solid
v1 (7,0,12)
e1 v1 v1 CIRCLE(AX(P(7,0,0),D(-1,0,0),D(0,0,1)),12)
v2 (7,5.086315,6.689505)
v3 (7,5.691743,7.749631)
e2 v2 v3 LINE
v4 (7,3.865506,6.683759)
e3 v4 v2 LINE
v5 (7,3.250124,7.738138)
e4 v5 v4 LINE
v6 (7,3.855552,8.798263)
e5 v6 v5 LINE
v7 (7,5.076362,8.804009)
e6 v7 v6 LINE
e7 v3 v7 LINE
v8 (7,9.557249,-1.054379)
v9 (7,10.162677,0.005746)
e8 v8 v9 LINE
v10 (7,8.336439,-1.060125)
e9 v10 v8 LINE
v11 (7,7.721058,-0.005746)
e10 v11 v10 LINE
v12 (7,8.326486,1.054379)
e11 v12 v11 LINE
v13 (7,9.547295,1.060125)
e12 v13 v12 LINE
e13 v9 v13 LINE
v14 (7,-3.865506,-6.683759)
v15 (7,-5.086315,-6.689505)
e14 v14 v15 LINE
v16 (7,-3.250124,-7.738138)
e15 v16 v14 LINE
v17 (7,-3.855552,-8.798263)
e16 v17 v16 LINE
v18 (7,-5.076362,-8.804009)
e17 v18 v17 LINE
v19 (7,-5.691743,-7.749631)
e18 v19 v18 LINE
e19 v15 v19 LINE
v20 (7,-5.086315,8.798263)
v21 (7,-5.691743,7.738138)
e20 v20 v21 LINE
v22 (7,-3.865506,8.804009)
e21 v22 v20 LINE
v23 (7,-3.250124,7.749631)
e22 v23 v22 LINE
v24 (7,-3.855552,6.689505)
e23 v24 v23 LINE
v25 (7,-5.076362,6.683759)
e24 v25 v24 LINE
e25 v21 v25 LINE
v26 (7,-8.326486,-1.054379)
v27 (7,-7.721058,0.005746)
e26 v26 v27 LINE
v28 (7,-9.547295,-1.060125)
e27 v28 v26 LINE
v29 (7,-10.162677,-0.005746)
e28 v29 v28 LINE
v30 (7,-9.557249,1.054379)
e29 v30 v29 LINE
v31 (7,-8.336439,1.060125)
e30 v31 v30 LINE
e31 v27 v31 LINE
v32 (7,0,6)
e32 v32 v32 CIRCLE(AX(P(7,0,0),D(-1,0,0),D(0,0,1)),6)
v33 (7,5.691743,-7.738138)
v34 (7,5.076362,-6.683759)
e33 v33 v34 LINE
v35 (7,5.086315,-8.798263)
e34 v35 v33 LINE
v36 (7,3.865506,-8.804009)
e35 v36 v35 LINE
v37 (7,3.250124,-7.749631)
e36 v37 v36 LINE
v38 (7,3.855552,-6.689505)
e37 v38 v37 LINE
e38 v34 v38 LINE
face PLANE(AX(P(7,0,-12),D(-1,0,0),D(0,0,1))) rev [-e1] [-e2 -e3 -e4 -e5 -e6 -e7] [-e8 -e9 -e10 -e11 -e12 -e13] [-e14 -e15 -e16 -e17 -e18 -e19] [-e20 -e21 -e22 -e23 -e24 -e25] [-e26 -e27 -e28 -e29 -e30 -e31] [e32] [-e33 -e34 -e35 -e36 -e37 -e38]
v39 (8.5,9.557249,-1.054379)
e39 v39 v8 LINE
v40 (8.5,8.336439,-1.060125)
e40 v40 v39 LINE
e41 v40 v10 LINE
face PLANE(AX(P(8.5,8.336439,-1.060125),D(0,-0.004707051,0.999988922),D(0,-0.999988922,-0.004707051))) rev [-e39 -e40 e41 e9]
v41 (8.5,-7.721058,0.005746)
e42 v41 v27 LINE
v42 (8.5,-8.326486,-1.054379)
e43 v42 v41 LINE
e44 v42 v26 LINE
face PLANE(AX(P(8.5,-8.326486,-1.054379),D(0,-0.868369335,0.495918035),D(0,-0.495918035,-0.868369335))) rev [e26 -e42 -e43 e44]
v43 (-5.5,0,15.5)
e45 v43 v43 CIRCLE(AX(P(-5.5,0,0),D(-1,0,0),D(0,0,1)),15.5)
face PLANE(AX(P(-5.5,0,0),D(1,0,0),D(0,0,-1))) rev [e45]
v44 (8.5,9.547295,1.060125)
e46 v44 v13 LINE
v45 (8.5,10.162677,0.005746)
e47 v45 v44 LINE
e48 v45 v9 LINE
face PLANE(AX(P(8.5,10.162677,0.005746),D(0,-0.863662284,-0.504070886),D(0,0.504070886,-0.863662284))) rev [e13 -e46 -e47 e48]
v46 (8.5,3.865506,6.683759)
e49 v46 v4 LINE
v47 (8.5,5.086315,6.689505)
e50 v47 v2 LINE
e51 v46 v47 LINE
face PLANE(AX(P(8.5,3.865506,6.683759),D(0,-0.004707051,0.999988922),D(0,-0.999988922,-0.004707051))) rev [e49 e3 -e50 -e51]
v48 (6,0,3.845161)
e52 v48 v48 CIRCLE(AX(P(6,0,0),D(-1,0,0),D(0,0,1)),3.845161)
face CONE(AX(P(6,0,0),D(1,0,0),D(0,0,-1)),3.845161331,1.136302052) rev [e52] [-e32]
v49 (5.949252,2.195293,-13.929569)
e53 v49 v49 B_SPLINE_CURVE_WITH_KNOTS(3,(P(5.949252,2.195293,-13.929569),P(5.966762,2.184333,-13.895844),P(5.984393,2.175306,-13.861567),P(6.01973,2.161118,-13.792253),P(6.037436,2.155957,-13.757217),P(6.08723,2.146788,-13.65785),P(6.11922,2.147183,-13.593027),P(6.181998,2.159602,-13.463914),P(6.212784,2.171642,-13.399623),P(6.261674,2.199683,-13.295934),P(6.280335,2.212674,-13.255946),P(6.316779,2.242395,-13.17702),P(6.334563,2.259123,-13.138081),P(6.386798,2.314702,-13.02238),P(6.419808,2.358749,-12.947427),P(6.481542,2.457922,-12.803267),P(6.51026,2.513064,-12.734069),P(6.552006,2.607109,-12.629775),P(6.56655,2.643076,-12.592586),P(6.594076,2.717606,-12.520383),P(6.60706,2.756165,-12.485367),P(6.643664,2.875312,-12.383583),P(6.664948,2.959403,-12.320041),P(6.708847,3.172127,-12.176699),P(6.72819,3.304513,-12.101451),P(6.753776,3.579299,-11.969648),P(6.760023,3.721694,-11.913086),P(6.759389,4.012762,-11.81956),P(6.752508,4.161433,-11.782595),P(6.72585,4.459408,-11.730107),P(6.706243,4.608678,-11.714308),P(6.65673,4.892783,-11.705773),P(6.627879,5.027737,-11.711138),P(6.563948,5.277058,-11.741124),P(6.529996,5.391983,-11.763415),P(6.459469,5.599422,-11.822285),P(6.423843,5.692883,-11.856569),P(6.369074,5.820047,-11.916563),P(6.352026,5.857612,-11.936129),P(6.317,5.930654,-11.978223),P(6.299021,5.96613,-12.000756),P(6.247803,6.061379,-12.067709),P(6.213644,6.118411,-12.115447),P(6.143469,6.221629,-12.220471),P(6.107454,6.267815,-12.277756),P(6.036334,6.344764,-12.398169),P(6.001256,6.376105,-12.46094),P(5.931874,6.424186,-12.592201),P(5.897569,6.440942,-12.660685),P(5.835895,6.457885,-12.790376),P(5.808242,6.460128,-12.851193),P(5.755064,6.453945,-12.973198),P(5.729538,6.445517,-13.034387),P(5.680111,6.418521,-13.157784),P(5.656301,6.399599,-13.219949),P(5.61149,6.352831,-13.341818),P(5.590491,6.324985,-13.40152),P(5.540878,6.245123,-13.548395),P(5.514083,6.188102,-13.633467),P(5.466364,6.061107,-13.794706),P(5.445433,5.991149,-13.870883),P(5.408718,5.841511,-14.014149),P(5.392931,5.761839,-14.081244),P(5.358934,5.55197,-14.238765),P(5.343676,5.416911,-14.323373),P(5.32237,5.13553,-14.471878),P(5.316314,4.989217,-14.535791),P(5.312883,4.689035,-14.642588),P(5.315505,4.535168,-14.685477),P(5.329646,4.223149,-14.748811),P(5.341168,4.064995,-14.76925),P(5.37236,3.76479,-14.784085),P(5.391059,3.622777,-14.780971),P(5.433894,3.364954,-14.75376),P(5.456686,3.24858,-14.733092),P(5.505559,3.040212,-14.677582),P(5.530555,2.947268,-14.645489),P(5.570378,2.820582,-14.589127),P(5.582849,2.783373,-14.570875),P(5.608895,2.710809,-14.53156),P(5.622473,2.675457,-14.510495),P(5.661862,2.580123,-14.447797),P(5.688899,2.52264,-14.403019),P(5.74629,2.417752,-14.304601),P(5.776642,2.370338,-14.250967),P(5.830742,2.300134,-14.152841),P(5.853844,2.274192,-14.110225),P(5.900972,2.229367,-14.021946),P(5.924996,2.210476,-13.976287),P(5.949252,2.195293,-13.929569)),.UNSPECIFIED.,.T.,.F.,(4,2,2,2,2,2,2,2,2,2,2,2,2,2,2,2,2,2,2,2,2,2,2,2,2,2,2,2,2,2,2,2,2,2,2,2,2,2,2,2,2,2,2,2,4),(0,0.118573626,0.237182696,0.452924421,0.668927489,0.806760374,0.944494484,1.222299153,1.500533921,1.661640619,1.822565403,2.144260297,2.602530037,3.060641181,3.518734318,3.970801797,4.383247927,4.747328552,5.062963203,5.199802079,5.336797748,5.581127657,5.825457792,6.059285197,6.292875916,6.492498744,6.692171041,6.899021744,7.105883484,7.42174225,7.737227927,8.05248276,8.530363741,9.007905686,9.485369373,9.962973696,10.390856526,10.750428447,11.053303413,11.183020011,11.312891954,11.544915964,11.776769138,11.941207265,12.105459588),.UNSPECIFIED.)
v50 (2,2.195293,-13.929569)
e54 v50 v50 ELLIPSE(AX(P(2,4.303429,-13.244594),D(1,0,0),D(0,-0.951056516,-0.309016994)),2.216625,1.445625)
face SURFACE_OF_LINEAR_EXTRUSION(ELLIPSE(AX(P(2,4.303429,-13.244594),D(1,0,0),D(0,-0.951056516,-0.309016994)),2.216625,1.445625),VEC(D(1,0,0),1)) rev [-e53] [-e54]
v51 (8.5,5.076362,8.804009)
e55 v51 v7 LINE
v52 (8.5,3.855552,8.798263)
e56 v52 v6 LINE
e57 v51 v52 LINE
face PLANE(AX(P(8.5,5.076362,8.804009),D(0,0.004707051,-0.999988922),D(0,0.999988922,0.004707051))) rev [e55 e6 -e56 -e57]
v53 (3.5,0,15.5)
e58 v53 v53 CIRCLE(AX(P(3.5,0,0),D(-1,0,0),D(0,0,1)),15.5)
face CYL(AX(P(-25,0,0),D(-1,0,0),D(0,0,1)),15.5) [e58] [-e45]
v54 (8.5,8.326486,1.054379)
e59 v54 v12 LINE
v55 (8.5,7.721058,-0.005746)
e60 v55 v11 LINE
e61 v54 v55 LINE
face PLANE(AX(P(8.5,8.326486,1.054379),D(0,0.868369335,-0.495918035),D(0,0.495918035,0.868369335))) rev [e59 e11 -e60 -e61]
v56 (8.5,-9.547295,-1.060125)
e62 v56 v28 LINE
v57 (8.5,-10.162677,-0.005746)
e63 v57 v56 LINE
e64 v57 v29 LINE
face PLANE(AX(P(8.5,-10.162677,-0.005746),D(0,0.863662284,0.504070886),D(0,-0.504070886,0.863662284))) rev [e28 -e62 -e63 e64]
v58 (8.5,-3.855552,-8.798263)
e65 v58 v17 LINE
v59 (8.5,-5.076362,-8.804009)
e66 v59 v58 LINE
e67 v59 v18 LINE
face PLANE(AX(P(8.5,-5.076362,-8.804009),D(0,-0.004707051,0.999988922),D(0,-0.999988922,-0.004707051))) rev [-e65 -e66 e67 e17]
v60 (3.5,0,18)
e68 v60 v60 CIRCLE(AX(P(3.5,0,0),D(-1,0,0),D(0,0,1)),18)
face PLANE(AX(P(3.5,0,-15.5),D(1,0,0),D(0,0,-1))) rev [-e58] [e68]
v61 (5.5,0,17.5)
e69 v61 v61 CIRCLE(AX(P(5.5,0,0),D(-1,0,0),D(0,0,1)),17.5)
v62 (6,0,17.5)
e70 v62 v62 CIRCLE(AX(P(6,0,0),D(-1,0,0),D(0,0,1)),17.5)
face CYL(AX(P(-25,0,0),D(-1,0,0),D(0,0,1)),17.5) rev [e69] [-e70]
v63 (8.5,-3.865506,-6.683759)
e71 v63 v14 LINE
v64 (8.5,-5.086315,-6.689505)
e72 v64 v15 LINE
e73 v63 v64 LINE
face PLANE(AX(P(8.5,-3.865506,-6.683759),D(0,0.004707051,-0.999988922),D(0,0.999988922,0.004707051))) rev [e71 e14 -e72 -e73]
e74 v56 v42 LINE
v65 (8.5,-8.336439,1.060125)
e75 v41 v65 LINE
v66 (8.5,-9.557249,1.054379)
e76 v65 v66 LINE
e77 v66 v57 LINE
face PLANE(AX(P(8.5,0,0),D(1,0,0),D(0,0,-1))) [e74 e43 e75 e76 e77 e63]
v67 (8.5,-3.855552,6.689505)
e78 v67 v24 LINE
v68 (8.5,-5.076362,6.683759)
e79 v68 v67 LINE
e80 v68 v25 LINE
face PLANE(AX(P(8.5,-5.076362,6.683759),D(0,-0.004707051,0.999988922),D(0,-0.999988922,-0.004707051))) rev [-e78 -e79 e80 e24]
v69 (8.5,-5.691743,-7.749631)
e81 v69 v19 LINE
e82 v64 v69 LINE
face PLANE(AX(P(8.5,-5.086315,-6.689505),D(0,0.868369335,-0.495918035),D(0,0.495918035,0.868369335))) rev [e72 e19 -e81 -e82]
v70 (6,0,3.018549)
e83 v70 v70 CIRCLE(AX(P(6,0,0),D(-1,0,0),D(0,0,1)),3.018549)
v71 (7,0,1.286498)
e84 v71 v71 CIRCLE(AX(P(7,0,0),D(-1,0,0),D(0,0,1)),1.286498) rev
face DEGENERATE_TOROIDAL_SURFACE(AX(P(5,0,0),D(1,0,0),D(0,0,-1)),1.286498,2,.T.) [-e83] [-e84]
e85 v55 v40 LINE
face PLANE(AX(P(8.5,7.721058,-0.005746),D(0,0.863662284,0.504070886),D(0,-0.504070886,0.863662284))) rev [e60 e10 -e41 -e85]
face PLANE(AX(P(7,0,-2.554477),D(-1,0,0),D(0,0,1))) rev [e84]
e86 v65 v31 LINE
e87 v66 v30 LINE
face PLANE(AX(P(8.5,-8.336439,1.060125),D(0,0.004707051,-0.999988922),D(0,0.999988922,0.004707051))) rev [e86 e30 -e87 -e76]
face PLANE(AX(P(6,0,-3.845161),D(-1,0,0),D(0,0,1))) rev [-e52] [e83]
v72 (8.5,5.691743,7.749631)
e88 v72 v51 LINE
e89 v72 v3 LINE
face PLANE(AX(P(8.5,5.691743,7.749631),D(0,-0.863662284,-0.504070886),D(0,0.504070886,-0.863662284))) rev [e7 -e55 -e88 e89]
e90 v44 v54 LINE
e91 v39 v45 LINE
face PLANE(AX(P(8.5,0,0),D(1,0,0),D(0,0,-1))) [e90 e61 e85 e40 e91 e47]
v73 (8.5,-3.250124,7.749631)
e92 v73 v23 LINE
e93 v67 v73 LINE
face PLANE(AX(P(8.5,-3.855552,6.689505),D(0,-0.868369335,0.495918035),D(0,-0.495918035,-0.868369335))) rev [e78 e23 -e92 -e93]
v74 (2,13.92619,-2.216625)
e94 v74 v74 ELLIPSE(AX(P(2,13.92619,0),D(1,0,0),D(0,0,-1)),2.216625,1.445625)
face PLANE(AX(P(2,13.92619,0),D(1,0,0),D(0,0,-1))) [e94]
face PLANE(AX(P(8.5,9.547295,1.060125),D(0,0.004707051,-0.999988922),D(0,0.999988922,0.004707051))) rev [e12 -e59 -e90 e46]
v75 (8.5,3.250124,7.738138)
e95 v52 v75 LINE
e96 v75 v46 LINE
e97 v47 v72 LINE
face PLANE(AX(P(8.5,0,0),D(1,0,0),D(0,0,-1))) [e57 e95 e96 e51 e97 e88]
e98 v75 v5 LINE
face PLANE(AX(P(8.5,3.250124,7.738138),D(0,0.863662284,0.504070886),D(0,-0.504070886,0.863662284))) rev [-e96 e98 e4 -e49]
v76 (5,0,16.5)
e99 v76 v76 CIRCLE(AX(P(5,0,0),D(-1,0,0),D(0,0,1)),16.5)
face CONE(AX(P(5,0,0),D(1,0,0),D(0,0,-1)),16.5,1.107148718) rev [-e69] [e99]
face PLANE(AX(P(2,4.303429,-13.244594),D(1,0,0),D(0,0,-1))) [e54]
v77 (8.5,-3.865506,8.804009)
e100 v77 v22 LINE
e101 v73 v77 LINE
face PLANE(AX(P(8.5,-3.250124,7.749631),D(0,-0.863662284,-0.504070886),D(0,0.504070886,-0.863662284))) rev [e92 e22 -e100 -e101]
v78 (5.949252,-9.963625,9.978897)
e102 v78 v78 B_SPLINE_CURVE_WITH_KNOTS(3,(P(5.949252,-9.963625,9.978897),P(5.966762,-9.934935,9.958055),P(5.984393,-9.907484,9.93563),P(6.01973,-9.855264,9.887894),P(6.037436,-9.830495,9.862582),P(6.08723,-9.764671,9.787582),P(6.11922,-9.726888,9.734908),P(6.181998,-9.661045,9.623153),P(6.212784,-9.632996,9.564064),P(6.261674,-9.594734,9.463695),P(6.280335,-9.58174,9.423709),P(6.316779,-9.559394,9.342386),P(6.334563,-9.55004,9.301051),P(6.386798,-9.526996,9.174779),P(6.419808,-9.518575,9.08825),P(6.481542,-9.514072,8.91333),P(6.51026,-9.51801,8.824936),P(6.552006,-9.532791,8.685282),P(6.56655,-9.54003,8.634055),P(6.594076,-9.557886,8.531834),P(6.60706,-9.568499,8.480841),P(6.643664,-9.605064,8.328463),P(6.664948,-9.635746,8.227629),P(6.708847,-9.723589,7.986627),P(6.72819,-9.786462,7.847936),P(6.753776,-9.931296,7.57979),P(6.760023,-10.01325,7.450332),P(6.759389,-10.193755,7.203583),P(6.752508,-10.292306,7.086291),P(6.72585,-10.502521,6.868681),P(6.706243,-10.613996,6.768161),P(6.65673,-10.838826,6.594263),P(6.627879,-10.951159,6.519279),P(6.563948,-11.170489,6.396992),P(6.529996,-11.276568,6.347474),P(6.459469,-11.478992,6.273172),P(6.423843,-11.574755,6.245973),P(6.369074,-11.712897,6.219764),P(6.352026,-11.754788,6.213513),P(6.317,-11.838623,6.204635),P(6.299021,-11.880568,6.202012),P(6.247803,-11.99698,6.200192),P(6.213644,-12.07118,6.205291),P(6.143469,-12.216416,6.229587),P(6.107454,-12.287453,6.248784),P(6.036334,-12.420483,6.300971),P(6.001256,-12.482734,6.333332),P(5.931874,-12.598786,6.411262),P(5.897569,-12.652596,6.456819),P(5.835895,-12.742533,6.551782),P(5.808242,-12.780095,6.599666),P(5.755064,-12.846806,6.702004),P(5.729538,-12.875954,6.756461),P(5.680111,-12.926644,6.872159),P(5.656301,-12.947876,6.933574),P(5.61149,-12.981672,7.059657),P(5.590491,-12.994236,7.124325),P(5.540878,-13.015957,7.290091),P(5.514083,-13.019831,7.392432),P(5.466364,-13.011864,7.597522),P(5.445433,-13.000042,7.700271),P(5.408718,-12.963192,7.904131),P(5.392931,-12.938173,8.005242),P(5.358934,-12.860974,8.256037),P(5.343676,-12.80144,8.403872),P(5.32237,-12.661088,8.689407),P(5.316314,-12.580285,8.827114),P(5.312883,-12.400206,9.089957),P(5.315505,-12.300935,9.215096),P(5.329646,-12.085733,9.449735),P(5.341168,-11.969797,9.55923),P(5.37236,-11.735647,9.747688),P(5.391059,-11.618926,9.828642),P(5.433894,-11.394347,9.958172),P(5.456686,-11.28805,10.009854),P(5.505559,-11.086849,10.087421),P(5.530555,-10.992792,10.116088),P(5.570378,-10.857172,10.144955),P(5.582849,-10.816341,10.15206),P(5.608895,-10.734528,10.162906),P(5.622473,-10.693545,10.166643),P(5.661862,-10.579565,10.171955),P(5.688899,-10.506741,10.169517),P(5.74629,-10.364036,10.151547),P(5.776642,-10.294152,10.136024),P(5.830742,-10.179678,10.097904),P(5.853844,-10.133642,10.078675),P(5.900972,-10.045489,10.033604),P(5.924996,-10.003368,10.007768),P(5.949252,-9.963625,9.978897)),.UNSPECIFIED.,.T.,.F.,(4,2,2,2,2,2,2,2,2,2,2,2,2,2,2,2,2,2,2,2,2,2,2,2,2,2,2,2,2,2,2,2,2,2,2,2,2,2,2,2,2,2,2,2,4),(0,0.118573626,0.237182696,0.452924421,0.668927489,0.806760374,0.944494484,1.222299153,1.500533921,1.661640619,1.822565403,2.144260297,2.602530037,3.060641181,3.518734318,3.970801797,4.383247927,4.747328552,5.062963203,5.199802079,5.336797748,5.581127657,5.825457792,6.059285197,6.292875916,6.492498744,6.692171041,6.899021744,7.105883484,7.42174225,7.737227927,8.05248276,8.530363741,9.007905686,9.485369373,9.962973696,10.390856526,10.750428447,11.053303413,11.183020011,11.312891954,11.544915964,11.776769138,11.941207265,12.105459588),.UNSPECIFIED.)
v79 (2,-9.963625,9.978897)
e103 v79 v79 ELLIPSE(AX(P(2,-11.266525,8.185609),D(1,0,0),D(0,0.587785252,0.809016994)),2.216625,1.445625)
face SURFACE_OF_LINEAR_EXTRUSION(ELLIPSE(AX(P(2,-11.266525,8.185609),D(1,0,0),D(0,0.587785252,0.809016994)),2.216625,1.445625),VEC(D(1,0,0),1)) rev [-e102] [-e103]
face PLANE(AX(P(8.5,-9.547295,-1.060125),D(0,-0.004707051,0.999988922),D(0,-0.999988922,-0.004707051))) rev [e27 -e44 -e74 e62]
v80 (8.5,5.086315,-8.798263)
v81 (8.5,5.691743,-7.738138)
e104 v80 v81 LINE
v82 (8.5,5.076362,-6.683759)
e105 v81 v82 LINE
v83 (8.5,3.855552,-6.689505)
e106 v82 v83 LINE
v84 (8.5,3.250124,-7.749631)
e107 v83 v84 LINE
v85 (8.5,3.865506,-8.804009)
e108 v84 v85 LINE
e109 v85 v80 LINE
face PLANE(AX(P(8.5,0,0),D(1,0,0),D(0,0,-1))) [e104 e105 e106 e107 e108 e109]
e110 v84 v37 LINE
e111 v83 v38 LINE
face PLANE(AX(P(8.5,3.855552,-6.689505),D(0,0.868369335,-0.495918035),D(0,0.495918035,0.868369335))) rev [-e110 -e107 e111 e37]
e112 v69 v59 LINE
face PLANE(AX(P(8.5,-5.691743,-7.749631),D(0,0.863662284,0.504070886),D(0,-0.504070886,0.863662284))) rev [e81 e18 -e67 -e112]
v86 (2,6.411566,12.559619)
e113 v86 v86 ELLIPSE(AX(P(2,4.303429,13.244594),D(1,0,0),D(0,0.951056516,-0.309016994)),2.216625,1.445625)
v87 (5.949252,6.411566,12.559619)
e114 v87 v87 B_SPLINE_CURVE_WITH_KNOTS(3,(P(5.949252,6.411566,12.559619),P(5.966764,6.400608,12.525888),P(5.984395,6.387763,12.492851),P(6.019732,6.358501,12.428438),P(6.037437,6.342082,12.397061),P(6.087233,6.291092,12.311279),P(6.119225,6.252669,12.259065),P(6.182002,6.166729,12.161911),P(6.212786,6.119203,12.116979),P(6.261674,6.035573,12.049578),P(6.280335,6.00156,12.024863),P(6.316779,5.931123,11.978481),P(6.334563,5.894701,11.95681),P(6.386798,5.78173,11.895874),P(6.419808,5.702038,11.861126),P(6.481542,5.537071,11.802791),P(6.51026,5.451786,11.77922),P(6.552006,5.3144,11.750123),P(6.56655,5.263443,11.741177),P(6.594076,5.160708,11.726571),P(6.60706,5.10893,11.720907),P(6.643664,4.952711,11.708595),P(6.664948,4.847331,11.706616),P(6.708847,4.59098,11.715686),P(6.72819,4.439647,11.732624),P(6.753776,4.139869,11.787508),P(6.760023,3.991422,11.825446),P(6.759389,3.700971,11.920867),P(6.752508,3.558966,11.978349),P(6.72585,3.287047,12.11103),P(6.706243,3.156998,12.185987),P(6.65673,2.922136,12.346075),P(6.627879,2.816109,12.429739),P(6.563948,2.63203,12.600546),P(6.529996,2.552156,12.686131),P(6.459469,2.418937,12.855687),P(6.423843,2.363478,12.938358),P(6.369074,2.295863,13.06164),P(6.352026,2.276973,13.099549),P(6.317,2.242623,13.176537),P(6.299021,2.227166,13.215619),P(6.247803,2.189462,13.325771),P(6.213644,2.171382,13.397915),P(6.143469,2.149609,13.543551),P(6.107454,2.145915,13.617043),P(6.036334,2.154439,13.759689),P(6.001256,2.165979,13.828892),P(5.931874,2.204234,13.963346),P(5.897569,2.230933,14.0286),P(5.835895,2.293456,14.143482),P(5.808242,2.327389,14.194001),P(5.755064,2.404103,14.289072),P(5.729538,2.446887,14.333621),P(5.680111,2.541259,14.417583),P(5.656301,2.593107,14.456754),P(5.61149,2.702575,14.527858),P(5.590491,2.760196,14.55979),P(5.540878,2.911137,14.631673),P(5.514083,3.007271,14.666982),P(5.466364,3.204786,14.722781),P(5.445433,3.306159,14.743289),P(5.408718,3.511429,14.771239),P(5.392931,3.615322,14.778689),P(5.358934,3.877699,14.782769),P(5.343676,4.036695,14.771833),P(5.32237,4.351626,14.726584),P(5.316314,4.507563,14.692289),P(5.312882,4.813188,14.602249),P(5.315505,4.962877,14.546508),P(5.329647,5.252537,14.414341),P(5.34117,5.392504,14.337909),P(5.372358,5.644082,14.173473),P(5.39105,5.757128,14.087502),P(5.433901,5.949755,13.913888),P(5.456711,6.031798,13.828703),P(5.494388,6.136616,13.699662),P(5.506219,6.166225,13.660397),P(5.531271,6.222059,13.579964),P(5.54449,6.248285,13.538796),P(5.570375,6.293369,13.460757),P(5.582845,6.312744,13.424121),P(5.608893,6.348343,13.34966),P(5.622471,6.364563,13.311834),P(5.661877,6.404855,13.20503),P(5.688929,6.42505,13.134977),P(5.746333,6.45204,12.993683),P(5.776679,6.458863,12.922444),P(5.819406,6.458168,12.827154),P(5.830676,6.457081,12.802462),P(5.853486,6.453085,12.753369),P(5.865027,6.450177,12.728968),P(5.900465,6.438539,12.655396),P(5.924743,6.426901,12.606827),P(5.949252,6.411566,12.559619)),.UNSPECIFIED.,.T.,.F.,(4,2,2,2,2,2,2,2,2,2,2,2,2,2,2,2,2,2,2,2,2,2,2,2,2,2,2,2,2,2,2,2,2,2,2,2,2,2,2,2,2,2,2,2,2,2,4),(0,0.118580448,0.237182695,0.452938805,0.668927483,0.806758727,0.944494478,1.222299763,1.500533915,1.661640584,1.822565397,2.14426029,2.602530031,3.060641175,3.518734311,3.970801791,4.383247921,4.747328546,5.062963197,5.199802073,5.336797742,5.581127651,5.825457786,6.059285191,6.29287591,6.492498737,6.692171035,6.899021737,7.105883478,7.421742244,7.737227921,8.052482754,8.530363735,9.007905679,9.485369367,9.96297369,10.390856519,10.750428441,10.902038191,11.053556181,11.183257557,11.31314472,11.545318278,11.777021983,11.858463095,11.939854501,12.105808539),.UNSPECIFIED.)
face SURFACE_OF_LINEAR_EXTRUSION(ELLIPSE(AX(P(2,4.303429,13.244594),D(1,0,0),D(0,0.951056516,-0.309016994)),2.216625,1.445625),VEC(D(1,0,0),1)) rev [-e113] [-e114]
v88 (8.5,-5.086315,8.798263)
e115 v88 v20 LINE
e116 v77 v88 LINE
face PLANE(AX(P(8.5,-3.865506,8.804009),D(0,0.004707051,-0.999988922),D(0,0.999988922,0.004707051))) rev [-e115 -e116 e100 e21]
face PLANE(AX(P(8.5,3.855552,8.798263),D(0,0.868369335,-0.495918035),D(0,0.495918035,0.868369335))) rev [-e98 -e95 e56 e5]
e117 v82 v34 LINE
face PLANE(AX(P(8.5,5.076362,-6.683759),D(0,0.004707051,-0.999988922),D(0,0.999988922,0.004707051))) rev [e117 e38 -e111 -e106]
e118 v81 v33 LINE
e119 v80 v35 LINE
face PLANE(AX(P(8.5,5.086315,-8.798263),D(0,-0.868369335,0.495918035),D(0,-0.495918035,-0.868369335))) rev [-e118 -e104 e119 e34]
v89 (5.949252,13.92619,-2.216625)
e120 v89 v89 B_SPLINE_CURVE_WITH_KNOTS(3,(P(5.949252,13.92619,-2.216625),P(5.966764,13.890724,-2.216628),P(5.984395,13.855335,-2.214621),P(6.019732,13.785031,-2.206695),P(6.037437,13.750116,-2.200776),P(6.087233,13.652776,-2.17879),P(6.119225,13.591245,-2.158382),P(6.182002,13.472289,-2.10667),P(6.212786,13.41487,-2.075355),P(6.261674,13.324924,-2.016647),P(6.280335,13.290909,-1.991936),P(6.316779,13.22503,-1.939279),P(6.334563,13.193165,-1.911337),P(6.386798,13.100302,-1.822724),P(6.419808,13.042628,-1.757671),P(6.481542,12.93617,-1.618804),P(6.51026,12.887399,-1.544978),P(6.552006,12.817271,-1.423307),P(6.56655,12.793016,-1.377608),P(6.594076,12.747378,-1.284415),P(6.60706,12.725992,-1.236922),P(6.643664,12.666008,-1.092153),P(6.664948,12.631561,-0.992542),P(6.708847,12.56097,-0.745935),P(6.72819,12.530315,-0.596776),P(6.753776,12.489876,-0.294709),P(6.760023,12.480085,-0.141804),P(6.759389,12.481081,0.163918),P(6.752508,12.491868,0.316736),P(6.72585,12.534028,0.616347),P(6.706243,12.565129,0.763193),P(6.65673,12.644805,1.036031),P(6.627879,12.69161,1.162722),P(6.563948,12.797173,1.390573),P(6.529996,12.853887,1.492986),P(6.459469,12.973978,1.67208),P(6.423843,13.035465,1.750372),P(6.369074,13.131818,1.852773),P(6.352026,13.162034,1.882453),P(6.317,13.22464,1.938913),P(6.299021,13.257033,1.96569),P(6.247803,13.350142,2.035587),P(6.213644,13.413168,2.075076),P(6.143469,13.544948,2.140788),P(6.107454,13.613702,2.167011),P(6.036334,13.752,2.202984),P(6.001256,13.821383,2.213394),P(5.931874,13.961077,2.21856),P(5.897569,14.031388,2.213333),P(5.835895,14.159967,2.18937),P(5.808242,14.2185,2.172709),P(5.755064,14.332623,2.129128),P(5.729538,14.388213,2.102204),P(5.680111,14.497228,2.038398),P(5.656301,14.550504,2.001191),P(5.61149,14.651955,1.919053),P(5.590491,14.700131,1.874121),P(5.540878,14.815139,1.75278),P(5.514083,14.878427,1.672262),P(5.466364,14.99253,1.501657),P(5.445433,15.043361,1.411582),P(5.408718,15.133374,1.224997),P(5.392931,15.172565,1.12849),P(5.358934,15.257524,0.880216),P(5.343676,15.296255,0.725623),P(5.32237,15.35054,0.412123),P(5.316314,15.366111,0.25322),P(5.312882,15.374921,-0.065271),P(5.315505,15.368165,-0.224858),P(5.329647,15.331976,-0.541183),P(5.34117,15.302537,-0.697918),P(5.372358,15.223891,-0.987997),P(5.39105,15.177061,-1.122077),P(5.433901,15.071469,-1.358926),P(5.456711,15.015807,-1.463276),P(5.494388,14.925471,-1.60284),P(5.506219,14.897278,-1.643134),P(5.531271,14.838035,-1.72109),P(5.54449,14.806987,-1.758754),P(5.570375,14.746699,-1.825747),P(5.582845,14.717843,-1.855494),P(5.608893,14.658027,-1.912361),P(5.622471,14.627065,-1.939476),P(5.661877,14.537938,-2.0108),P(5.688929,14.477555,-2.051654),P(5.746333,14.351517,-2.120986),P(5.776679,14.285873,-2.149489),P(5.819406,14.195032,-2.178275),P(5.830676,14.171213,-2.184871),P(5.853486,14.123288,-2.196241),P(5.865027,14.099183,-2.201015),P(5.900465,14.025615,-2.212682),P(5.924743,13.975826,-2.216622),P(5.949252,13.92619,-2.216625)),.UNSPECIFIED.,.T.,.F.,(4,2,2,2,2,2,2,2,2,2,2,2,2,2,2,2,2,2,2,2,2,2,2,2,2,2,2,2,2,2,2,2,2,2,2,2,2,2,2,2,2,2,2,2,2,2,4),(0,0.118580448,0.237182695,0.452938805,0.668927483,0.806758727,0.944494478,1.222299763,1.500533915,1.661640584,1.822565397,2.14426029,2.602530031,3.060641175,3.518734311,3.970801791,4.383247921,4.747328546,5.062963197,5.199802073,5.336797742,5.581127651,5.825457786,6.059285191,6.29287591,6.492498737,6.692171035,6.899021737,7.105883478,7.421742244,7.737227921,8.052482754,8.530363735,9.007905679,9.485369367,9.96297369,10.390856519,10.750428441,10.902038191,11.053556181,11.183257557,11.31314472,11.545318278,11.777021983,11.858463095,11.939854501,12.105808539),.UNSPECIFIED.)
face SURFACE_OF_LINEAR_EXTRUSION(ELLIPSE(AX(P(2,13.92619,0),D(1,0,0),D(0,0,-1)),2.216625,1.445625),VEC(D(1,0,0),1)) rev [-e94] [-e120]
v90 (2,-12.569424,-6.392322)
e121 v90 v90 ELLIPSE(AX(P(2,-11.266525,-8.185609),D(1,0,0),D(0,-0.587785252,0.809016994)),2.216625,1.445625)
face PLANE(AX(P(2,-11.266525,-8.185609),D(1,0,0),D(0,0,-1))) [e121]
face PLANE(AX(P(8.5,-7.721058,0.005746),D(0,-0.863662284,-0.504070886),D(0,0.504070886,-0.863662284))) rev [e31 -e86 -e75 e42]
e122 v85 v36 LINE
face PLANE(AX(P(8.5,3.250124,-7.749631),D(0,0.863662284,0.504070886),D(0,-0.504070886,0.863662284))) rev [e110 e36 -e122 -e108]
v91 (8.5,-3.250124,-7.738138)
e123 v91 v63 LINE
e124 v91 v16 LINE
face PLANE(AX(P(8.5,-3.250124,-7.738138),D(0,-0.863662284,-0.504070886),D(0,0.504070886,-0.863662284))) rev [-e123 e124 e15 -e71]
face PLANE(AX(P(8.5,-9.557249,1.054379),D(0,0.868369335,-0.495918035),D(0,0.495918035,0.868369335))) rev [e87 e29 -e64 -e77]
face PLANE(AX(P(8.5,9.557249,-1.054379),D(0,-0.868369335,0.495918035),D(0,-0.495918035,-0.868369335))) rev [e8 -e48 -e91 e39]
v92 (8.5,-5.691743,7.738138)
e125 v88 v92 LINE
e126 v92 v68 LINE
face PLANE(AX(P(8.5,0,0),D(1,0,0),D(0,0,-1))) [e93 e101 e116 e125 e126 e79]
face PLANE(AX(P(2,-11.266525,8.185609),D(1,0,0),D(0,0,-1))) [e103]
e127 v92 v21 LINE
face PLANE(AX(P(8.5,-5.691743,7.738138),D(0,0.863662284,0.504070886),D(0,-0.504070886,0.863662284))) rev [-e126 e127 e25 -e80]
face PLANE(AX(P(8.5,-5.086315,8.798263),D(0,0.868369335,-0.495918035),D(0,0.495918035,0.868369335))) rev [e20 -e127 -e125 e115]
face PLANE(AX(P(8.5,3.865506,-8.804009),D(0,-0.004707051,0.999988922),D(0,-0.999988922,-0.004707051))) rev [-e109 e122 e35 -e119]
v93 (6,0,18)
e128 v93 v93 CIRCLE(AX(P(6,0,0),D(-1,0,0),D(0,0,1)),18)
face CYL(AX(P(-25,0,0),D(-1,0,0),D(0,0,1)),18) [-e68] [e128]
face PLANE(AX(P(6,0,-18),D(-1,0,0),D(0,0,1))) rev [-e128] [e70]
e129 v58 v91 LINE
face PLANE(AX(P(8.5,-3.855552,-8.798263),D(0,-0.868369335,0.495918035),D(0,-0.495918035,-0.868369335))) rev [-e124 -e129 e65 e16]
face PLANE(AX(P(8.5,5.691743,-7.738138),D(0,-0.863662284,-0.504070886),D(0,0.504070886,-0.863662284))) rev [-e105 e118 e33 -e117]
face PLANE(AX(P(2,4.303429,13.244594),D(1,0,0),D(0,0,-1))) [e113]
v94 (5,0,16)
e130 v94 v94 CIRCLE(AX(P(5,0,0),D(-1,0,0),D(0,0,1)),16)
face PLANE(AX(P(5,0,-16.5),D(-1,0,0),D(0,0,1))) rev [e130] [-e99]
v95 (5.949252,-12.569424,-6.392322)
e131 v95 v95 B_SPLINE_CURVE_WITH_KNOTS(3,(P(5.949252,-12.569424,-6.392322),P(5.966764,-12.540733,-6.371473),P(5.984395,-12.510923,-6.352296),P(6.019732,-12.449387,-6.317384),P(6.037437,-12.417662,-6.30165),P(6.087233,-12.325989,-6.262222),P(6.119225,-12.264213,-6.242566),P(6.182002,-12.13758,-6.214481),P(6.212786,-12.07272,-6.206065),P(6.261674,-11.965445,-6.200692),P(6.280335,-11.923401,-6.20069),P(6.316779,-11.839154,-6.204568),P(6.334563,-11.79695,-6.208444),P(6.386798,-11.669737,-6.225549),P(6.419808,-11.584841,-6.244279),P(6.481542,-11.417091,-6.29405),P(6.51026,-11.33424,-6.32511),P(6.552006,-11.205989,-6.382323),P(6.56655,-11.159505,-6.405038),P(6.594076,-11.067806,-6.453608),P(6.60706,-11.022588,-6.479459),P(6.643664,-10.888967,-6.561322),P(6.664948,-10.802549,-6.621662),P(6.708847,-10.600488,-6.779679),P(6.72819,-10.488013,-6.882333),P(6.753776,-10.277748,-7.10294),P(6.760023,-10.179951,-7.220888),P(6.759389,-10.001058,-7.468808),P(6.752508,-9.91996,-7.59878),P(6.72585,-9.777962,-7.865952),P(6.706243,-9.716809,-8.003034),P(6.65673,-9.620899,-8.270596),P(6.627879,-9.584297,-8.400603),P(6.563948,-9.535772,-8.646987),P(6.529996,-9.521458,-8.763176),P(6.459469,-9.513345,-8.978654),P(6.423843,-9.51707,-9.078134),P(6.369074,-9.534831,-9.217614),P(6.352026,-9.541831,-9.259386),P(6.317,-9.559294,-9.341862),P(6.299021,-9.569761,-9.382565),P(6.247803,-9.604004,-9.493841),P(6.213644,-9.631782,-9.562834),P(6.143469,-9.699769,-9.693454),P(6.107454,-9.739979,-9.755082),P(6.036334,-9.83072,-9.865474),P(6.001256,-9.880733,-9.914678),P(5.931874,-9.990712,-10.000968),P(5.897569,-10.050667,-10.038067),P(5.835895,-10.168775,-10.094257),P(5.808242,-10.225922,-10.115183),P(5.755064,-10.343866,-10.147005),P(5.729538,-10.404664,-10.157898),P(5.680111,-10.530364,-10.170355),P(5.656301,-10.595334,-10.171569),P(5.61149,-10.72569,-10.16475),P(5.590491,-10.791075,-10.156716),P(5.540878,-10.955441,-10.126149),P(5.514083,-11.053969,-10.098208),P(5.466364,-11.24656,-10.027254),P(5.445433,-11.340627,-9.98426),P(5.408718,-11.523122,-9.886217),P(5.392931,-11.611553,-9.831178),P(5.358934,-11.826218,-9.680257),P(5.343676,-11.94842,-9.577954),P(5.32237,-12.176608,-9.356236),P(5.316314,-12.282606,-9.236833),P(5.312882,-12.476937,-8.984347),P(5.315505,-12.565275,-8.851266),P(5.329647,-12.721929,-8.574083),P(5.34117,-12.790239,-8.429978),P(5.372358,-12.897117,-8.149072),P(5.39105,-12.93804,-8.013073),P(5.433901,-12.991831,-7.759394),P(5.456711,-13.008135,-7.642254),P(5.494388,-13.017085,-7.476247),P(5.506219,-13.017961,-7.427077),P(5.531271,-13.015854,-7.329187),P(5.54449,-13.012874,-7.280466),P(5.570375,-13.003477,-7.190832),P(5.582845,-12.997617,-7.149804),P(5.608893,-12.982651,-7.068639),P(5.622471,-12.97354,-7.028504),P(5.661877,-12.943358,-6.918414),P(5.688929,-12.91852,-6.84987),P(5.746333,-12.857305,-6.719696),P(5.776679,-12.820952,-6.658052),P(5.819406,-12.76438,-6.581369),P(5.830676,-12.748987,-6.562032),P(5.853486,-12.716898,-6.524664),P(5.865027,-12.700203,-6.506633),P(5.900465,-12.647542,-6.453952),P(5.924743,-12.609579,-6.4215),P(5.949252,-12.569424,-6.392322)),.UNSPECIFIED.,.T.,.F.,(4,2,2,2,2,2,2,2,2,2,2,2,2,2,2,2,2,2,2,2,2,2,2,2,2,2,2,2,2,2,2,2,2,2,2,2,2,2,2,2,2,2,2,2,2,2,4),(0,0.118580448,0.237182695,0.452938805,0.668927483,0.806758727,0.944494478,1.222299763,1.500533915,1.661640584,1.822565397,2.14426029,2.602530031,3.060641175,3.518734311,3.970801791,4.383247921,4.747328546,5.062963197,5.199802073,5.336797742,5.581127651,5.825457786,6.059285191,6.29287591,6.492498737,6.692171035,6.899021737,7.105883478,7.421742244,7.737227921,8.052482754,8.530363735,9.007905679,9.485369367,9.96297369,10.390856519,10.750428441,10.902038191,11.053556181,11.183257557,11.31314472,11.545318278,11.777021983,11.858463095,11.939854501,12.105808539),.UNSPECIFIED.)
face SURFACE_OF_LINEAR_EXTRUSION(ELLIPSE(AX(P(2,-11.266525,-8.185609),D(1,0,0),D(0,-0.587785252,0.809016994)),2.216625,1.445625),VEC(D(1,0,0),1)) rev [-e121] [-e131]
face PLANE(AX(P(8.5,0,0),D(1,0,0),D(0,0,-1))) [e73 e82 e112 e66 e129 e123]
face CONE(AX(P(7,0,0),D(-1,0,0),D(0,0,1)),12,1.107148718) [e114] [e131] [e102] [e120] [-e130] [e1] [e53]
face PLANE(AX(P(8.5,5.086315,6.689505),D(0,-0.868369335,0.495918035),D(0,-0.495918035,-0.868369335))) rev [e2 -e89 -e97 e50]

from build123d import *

# Parameters (mm, degrees)
SKETCH3_RX          = 2.216625444
SKETCH3_RY          = 1.445625289
CUT_EXTRUDE1_DEPTH  = 5
FILLET1_R           = 2
BOSS_EXTRUDE1_DEPTH = 1.5


with BuildPart() as part:
    # Sketch1 → Revolve1 (revolve)
    with BuildSketch(Plane(origin=(0, 0, 0), x_dir=(1, 0, 0), z_dir=(0, 1, 0)), mode=Mode.PRIVATE) as revolve1_sk:
        Polygon((5.5, 0), (-5.5, 0), (-5.5, 15.5), (3.5, 15.5), (3.5, 18), (5.5, 18), (6, 18), (6, 17.5), (5.5, 17.5), (5, 16.5), (5, 16), (7, 12), (7, 6), (6, 3.845161331), (6, 3.018549032), (7, 2.554477167), (7, 0), align=None)
    revolve(revolve1_sk.sketch.rotate(Axis((-25, 0, 0), (1, 0, 0)), 180), axis=Axis((-25, 0, 0), (1, 0, 0)))

    # Sketch3 → Cut-Extrude1 (cut, symmetric)
    with BuildSketch(Plane(origin=(7, 0, 0), x_dir=(0, 0, -1), z_dir=(1, 0, 0))):
        with Locations(Location((0, 13.926190288), (0, 0, 0))):
            Ellipse(SKETCH3_RX, SKETCH3_RY)
        with Locations(Location((13.244594021, 4.303429466), (0, 0, 108))):
            Ellipse(SKETCH3_RX, SKETCH3_RY)
        with Locations(Location((8.185609272, -11.26652461), (0, 0, 36))):
            Ellipse(SKETCH3_RX, SKETCH3_RY)
        with Locations(Location((-8.185609272, -11.26652461), (0, 0, -36))):
            Ellipse(SKETCH3_RX, SKETCH3_RY)
        with Locations(Location((-13.244594021, 4.303429466), (0, 0, 72))):
            Ellipse(SKETCH3_RX, SKETCH3_RY)
    extrude(amount=CUT_EXTRUDE1_DEPTH, both=True, mode=Mode.SUBTRACT)

    # Fillet1
    # the kernel refuses this fillet: 2 mm, written as the material it takes off along each edge
    with BuildSketch(Plane(origin=(7, 0, 0), x_dir=(0, 0, 1), z_dir=(0, 1, 0))) as fillet1_piece_1:
        with BuildLine():
            CenterArc((1.286498225, -2), FILLET1_R, 30, 60)
            Line((1.286498225, 0), (1.286498225, 0.04))
            Line((1.286498225, 0.04), (2.554477167, 0.04))
            Line((2.554477167, 0.04), (2.590760489, 0.016838069))
            ThreePointArc((2.590760489, 0.016838069), (2.822796422, -0.483161931), (3.053190048, -0.98))
            Line((3.053190048, -0.98), (3.018549032, -1))
        make_face()
    revolve(axis=Axis((7, 0, 0), (1, 0, 0)), mode=Mode.SUBTRACT)

    # Sketch4 → Boss-Extrude1 (add)
    with BuildSketch(Plane(origin=(7, 0, 0), x_dir=(0, 0, -1), z_dir=(1, 0, 0))):
        Polygon((7.749630704, 3.250124219), (8.80400944, 3.865505525), (8.798262965, 5.086314949), (7.738137753, 5.691743068), (6.683759016, 5.076361762), (6.689505491, 3.855552338), align=None)
        Polygon((1.060125212, 8.336439169), (1.054378737, 9.557248593), (-0.005746475, 10.162676712), (-1.060125212, 9.547295406), (-1.054378737, 8.326485982), (0.005746475, 7.721057863), align=None)
        Polygon((6.689505491, -5.086314949), (7.749630704, -5.691743068), (8.80400944, -5.076361762), (8.798262965, -3.855552338), (7.738137753, -3.250124219), (6.683759016, -3.865505525), align=None)
        Polygon((-1.060125212, -8.336439169), (-1.054378737, -9.557248593), (0.005746475, -10.162676712), (1.060125212, -9.547295406), (1.054378737, -8.326485982), (-0.005746475, -7.721057863), align=None)
        Polygon((-7.749630704, -3.250124219), (-8.80400944, -3.865505525), (-8.798262965, -5.086314949), (-7.738137753, -5.691743068), (-6.683759016, -5.076361762), (-6.689505491, -3.855552338), align=None)
        Polygon((-6.689505491, 5.086314949), (-7.749630704, 5.691743068), (-8.80400944, 5.076361762), (-8.798262965, 3.855552338), (-7.738137753, 3.250124219), (-6.683759016, 3.865505525), align=None)
    extrude(amount=BOSS_EXTRUDE1_DEPTH)


solid = part.part
